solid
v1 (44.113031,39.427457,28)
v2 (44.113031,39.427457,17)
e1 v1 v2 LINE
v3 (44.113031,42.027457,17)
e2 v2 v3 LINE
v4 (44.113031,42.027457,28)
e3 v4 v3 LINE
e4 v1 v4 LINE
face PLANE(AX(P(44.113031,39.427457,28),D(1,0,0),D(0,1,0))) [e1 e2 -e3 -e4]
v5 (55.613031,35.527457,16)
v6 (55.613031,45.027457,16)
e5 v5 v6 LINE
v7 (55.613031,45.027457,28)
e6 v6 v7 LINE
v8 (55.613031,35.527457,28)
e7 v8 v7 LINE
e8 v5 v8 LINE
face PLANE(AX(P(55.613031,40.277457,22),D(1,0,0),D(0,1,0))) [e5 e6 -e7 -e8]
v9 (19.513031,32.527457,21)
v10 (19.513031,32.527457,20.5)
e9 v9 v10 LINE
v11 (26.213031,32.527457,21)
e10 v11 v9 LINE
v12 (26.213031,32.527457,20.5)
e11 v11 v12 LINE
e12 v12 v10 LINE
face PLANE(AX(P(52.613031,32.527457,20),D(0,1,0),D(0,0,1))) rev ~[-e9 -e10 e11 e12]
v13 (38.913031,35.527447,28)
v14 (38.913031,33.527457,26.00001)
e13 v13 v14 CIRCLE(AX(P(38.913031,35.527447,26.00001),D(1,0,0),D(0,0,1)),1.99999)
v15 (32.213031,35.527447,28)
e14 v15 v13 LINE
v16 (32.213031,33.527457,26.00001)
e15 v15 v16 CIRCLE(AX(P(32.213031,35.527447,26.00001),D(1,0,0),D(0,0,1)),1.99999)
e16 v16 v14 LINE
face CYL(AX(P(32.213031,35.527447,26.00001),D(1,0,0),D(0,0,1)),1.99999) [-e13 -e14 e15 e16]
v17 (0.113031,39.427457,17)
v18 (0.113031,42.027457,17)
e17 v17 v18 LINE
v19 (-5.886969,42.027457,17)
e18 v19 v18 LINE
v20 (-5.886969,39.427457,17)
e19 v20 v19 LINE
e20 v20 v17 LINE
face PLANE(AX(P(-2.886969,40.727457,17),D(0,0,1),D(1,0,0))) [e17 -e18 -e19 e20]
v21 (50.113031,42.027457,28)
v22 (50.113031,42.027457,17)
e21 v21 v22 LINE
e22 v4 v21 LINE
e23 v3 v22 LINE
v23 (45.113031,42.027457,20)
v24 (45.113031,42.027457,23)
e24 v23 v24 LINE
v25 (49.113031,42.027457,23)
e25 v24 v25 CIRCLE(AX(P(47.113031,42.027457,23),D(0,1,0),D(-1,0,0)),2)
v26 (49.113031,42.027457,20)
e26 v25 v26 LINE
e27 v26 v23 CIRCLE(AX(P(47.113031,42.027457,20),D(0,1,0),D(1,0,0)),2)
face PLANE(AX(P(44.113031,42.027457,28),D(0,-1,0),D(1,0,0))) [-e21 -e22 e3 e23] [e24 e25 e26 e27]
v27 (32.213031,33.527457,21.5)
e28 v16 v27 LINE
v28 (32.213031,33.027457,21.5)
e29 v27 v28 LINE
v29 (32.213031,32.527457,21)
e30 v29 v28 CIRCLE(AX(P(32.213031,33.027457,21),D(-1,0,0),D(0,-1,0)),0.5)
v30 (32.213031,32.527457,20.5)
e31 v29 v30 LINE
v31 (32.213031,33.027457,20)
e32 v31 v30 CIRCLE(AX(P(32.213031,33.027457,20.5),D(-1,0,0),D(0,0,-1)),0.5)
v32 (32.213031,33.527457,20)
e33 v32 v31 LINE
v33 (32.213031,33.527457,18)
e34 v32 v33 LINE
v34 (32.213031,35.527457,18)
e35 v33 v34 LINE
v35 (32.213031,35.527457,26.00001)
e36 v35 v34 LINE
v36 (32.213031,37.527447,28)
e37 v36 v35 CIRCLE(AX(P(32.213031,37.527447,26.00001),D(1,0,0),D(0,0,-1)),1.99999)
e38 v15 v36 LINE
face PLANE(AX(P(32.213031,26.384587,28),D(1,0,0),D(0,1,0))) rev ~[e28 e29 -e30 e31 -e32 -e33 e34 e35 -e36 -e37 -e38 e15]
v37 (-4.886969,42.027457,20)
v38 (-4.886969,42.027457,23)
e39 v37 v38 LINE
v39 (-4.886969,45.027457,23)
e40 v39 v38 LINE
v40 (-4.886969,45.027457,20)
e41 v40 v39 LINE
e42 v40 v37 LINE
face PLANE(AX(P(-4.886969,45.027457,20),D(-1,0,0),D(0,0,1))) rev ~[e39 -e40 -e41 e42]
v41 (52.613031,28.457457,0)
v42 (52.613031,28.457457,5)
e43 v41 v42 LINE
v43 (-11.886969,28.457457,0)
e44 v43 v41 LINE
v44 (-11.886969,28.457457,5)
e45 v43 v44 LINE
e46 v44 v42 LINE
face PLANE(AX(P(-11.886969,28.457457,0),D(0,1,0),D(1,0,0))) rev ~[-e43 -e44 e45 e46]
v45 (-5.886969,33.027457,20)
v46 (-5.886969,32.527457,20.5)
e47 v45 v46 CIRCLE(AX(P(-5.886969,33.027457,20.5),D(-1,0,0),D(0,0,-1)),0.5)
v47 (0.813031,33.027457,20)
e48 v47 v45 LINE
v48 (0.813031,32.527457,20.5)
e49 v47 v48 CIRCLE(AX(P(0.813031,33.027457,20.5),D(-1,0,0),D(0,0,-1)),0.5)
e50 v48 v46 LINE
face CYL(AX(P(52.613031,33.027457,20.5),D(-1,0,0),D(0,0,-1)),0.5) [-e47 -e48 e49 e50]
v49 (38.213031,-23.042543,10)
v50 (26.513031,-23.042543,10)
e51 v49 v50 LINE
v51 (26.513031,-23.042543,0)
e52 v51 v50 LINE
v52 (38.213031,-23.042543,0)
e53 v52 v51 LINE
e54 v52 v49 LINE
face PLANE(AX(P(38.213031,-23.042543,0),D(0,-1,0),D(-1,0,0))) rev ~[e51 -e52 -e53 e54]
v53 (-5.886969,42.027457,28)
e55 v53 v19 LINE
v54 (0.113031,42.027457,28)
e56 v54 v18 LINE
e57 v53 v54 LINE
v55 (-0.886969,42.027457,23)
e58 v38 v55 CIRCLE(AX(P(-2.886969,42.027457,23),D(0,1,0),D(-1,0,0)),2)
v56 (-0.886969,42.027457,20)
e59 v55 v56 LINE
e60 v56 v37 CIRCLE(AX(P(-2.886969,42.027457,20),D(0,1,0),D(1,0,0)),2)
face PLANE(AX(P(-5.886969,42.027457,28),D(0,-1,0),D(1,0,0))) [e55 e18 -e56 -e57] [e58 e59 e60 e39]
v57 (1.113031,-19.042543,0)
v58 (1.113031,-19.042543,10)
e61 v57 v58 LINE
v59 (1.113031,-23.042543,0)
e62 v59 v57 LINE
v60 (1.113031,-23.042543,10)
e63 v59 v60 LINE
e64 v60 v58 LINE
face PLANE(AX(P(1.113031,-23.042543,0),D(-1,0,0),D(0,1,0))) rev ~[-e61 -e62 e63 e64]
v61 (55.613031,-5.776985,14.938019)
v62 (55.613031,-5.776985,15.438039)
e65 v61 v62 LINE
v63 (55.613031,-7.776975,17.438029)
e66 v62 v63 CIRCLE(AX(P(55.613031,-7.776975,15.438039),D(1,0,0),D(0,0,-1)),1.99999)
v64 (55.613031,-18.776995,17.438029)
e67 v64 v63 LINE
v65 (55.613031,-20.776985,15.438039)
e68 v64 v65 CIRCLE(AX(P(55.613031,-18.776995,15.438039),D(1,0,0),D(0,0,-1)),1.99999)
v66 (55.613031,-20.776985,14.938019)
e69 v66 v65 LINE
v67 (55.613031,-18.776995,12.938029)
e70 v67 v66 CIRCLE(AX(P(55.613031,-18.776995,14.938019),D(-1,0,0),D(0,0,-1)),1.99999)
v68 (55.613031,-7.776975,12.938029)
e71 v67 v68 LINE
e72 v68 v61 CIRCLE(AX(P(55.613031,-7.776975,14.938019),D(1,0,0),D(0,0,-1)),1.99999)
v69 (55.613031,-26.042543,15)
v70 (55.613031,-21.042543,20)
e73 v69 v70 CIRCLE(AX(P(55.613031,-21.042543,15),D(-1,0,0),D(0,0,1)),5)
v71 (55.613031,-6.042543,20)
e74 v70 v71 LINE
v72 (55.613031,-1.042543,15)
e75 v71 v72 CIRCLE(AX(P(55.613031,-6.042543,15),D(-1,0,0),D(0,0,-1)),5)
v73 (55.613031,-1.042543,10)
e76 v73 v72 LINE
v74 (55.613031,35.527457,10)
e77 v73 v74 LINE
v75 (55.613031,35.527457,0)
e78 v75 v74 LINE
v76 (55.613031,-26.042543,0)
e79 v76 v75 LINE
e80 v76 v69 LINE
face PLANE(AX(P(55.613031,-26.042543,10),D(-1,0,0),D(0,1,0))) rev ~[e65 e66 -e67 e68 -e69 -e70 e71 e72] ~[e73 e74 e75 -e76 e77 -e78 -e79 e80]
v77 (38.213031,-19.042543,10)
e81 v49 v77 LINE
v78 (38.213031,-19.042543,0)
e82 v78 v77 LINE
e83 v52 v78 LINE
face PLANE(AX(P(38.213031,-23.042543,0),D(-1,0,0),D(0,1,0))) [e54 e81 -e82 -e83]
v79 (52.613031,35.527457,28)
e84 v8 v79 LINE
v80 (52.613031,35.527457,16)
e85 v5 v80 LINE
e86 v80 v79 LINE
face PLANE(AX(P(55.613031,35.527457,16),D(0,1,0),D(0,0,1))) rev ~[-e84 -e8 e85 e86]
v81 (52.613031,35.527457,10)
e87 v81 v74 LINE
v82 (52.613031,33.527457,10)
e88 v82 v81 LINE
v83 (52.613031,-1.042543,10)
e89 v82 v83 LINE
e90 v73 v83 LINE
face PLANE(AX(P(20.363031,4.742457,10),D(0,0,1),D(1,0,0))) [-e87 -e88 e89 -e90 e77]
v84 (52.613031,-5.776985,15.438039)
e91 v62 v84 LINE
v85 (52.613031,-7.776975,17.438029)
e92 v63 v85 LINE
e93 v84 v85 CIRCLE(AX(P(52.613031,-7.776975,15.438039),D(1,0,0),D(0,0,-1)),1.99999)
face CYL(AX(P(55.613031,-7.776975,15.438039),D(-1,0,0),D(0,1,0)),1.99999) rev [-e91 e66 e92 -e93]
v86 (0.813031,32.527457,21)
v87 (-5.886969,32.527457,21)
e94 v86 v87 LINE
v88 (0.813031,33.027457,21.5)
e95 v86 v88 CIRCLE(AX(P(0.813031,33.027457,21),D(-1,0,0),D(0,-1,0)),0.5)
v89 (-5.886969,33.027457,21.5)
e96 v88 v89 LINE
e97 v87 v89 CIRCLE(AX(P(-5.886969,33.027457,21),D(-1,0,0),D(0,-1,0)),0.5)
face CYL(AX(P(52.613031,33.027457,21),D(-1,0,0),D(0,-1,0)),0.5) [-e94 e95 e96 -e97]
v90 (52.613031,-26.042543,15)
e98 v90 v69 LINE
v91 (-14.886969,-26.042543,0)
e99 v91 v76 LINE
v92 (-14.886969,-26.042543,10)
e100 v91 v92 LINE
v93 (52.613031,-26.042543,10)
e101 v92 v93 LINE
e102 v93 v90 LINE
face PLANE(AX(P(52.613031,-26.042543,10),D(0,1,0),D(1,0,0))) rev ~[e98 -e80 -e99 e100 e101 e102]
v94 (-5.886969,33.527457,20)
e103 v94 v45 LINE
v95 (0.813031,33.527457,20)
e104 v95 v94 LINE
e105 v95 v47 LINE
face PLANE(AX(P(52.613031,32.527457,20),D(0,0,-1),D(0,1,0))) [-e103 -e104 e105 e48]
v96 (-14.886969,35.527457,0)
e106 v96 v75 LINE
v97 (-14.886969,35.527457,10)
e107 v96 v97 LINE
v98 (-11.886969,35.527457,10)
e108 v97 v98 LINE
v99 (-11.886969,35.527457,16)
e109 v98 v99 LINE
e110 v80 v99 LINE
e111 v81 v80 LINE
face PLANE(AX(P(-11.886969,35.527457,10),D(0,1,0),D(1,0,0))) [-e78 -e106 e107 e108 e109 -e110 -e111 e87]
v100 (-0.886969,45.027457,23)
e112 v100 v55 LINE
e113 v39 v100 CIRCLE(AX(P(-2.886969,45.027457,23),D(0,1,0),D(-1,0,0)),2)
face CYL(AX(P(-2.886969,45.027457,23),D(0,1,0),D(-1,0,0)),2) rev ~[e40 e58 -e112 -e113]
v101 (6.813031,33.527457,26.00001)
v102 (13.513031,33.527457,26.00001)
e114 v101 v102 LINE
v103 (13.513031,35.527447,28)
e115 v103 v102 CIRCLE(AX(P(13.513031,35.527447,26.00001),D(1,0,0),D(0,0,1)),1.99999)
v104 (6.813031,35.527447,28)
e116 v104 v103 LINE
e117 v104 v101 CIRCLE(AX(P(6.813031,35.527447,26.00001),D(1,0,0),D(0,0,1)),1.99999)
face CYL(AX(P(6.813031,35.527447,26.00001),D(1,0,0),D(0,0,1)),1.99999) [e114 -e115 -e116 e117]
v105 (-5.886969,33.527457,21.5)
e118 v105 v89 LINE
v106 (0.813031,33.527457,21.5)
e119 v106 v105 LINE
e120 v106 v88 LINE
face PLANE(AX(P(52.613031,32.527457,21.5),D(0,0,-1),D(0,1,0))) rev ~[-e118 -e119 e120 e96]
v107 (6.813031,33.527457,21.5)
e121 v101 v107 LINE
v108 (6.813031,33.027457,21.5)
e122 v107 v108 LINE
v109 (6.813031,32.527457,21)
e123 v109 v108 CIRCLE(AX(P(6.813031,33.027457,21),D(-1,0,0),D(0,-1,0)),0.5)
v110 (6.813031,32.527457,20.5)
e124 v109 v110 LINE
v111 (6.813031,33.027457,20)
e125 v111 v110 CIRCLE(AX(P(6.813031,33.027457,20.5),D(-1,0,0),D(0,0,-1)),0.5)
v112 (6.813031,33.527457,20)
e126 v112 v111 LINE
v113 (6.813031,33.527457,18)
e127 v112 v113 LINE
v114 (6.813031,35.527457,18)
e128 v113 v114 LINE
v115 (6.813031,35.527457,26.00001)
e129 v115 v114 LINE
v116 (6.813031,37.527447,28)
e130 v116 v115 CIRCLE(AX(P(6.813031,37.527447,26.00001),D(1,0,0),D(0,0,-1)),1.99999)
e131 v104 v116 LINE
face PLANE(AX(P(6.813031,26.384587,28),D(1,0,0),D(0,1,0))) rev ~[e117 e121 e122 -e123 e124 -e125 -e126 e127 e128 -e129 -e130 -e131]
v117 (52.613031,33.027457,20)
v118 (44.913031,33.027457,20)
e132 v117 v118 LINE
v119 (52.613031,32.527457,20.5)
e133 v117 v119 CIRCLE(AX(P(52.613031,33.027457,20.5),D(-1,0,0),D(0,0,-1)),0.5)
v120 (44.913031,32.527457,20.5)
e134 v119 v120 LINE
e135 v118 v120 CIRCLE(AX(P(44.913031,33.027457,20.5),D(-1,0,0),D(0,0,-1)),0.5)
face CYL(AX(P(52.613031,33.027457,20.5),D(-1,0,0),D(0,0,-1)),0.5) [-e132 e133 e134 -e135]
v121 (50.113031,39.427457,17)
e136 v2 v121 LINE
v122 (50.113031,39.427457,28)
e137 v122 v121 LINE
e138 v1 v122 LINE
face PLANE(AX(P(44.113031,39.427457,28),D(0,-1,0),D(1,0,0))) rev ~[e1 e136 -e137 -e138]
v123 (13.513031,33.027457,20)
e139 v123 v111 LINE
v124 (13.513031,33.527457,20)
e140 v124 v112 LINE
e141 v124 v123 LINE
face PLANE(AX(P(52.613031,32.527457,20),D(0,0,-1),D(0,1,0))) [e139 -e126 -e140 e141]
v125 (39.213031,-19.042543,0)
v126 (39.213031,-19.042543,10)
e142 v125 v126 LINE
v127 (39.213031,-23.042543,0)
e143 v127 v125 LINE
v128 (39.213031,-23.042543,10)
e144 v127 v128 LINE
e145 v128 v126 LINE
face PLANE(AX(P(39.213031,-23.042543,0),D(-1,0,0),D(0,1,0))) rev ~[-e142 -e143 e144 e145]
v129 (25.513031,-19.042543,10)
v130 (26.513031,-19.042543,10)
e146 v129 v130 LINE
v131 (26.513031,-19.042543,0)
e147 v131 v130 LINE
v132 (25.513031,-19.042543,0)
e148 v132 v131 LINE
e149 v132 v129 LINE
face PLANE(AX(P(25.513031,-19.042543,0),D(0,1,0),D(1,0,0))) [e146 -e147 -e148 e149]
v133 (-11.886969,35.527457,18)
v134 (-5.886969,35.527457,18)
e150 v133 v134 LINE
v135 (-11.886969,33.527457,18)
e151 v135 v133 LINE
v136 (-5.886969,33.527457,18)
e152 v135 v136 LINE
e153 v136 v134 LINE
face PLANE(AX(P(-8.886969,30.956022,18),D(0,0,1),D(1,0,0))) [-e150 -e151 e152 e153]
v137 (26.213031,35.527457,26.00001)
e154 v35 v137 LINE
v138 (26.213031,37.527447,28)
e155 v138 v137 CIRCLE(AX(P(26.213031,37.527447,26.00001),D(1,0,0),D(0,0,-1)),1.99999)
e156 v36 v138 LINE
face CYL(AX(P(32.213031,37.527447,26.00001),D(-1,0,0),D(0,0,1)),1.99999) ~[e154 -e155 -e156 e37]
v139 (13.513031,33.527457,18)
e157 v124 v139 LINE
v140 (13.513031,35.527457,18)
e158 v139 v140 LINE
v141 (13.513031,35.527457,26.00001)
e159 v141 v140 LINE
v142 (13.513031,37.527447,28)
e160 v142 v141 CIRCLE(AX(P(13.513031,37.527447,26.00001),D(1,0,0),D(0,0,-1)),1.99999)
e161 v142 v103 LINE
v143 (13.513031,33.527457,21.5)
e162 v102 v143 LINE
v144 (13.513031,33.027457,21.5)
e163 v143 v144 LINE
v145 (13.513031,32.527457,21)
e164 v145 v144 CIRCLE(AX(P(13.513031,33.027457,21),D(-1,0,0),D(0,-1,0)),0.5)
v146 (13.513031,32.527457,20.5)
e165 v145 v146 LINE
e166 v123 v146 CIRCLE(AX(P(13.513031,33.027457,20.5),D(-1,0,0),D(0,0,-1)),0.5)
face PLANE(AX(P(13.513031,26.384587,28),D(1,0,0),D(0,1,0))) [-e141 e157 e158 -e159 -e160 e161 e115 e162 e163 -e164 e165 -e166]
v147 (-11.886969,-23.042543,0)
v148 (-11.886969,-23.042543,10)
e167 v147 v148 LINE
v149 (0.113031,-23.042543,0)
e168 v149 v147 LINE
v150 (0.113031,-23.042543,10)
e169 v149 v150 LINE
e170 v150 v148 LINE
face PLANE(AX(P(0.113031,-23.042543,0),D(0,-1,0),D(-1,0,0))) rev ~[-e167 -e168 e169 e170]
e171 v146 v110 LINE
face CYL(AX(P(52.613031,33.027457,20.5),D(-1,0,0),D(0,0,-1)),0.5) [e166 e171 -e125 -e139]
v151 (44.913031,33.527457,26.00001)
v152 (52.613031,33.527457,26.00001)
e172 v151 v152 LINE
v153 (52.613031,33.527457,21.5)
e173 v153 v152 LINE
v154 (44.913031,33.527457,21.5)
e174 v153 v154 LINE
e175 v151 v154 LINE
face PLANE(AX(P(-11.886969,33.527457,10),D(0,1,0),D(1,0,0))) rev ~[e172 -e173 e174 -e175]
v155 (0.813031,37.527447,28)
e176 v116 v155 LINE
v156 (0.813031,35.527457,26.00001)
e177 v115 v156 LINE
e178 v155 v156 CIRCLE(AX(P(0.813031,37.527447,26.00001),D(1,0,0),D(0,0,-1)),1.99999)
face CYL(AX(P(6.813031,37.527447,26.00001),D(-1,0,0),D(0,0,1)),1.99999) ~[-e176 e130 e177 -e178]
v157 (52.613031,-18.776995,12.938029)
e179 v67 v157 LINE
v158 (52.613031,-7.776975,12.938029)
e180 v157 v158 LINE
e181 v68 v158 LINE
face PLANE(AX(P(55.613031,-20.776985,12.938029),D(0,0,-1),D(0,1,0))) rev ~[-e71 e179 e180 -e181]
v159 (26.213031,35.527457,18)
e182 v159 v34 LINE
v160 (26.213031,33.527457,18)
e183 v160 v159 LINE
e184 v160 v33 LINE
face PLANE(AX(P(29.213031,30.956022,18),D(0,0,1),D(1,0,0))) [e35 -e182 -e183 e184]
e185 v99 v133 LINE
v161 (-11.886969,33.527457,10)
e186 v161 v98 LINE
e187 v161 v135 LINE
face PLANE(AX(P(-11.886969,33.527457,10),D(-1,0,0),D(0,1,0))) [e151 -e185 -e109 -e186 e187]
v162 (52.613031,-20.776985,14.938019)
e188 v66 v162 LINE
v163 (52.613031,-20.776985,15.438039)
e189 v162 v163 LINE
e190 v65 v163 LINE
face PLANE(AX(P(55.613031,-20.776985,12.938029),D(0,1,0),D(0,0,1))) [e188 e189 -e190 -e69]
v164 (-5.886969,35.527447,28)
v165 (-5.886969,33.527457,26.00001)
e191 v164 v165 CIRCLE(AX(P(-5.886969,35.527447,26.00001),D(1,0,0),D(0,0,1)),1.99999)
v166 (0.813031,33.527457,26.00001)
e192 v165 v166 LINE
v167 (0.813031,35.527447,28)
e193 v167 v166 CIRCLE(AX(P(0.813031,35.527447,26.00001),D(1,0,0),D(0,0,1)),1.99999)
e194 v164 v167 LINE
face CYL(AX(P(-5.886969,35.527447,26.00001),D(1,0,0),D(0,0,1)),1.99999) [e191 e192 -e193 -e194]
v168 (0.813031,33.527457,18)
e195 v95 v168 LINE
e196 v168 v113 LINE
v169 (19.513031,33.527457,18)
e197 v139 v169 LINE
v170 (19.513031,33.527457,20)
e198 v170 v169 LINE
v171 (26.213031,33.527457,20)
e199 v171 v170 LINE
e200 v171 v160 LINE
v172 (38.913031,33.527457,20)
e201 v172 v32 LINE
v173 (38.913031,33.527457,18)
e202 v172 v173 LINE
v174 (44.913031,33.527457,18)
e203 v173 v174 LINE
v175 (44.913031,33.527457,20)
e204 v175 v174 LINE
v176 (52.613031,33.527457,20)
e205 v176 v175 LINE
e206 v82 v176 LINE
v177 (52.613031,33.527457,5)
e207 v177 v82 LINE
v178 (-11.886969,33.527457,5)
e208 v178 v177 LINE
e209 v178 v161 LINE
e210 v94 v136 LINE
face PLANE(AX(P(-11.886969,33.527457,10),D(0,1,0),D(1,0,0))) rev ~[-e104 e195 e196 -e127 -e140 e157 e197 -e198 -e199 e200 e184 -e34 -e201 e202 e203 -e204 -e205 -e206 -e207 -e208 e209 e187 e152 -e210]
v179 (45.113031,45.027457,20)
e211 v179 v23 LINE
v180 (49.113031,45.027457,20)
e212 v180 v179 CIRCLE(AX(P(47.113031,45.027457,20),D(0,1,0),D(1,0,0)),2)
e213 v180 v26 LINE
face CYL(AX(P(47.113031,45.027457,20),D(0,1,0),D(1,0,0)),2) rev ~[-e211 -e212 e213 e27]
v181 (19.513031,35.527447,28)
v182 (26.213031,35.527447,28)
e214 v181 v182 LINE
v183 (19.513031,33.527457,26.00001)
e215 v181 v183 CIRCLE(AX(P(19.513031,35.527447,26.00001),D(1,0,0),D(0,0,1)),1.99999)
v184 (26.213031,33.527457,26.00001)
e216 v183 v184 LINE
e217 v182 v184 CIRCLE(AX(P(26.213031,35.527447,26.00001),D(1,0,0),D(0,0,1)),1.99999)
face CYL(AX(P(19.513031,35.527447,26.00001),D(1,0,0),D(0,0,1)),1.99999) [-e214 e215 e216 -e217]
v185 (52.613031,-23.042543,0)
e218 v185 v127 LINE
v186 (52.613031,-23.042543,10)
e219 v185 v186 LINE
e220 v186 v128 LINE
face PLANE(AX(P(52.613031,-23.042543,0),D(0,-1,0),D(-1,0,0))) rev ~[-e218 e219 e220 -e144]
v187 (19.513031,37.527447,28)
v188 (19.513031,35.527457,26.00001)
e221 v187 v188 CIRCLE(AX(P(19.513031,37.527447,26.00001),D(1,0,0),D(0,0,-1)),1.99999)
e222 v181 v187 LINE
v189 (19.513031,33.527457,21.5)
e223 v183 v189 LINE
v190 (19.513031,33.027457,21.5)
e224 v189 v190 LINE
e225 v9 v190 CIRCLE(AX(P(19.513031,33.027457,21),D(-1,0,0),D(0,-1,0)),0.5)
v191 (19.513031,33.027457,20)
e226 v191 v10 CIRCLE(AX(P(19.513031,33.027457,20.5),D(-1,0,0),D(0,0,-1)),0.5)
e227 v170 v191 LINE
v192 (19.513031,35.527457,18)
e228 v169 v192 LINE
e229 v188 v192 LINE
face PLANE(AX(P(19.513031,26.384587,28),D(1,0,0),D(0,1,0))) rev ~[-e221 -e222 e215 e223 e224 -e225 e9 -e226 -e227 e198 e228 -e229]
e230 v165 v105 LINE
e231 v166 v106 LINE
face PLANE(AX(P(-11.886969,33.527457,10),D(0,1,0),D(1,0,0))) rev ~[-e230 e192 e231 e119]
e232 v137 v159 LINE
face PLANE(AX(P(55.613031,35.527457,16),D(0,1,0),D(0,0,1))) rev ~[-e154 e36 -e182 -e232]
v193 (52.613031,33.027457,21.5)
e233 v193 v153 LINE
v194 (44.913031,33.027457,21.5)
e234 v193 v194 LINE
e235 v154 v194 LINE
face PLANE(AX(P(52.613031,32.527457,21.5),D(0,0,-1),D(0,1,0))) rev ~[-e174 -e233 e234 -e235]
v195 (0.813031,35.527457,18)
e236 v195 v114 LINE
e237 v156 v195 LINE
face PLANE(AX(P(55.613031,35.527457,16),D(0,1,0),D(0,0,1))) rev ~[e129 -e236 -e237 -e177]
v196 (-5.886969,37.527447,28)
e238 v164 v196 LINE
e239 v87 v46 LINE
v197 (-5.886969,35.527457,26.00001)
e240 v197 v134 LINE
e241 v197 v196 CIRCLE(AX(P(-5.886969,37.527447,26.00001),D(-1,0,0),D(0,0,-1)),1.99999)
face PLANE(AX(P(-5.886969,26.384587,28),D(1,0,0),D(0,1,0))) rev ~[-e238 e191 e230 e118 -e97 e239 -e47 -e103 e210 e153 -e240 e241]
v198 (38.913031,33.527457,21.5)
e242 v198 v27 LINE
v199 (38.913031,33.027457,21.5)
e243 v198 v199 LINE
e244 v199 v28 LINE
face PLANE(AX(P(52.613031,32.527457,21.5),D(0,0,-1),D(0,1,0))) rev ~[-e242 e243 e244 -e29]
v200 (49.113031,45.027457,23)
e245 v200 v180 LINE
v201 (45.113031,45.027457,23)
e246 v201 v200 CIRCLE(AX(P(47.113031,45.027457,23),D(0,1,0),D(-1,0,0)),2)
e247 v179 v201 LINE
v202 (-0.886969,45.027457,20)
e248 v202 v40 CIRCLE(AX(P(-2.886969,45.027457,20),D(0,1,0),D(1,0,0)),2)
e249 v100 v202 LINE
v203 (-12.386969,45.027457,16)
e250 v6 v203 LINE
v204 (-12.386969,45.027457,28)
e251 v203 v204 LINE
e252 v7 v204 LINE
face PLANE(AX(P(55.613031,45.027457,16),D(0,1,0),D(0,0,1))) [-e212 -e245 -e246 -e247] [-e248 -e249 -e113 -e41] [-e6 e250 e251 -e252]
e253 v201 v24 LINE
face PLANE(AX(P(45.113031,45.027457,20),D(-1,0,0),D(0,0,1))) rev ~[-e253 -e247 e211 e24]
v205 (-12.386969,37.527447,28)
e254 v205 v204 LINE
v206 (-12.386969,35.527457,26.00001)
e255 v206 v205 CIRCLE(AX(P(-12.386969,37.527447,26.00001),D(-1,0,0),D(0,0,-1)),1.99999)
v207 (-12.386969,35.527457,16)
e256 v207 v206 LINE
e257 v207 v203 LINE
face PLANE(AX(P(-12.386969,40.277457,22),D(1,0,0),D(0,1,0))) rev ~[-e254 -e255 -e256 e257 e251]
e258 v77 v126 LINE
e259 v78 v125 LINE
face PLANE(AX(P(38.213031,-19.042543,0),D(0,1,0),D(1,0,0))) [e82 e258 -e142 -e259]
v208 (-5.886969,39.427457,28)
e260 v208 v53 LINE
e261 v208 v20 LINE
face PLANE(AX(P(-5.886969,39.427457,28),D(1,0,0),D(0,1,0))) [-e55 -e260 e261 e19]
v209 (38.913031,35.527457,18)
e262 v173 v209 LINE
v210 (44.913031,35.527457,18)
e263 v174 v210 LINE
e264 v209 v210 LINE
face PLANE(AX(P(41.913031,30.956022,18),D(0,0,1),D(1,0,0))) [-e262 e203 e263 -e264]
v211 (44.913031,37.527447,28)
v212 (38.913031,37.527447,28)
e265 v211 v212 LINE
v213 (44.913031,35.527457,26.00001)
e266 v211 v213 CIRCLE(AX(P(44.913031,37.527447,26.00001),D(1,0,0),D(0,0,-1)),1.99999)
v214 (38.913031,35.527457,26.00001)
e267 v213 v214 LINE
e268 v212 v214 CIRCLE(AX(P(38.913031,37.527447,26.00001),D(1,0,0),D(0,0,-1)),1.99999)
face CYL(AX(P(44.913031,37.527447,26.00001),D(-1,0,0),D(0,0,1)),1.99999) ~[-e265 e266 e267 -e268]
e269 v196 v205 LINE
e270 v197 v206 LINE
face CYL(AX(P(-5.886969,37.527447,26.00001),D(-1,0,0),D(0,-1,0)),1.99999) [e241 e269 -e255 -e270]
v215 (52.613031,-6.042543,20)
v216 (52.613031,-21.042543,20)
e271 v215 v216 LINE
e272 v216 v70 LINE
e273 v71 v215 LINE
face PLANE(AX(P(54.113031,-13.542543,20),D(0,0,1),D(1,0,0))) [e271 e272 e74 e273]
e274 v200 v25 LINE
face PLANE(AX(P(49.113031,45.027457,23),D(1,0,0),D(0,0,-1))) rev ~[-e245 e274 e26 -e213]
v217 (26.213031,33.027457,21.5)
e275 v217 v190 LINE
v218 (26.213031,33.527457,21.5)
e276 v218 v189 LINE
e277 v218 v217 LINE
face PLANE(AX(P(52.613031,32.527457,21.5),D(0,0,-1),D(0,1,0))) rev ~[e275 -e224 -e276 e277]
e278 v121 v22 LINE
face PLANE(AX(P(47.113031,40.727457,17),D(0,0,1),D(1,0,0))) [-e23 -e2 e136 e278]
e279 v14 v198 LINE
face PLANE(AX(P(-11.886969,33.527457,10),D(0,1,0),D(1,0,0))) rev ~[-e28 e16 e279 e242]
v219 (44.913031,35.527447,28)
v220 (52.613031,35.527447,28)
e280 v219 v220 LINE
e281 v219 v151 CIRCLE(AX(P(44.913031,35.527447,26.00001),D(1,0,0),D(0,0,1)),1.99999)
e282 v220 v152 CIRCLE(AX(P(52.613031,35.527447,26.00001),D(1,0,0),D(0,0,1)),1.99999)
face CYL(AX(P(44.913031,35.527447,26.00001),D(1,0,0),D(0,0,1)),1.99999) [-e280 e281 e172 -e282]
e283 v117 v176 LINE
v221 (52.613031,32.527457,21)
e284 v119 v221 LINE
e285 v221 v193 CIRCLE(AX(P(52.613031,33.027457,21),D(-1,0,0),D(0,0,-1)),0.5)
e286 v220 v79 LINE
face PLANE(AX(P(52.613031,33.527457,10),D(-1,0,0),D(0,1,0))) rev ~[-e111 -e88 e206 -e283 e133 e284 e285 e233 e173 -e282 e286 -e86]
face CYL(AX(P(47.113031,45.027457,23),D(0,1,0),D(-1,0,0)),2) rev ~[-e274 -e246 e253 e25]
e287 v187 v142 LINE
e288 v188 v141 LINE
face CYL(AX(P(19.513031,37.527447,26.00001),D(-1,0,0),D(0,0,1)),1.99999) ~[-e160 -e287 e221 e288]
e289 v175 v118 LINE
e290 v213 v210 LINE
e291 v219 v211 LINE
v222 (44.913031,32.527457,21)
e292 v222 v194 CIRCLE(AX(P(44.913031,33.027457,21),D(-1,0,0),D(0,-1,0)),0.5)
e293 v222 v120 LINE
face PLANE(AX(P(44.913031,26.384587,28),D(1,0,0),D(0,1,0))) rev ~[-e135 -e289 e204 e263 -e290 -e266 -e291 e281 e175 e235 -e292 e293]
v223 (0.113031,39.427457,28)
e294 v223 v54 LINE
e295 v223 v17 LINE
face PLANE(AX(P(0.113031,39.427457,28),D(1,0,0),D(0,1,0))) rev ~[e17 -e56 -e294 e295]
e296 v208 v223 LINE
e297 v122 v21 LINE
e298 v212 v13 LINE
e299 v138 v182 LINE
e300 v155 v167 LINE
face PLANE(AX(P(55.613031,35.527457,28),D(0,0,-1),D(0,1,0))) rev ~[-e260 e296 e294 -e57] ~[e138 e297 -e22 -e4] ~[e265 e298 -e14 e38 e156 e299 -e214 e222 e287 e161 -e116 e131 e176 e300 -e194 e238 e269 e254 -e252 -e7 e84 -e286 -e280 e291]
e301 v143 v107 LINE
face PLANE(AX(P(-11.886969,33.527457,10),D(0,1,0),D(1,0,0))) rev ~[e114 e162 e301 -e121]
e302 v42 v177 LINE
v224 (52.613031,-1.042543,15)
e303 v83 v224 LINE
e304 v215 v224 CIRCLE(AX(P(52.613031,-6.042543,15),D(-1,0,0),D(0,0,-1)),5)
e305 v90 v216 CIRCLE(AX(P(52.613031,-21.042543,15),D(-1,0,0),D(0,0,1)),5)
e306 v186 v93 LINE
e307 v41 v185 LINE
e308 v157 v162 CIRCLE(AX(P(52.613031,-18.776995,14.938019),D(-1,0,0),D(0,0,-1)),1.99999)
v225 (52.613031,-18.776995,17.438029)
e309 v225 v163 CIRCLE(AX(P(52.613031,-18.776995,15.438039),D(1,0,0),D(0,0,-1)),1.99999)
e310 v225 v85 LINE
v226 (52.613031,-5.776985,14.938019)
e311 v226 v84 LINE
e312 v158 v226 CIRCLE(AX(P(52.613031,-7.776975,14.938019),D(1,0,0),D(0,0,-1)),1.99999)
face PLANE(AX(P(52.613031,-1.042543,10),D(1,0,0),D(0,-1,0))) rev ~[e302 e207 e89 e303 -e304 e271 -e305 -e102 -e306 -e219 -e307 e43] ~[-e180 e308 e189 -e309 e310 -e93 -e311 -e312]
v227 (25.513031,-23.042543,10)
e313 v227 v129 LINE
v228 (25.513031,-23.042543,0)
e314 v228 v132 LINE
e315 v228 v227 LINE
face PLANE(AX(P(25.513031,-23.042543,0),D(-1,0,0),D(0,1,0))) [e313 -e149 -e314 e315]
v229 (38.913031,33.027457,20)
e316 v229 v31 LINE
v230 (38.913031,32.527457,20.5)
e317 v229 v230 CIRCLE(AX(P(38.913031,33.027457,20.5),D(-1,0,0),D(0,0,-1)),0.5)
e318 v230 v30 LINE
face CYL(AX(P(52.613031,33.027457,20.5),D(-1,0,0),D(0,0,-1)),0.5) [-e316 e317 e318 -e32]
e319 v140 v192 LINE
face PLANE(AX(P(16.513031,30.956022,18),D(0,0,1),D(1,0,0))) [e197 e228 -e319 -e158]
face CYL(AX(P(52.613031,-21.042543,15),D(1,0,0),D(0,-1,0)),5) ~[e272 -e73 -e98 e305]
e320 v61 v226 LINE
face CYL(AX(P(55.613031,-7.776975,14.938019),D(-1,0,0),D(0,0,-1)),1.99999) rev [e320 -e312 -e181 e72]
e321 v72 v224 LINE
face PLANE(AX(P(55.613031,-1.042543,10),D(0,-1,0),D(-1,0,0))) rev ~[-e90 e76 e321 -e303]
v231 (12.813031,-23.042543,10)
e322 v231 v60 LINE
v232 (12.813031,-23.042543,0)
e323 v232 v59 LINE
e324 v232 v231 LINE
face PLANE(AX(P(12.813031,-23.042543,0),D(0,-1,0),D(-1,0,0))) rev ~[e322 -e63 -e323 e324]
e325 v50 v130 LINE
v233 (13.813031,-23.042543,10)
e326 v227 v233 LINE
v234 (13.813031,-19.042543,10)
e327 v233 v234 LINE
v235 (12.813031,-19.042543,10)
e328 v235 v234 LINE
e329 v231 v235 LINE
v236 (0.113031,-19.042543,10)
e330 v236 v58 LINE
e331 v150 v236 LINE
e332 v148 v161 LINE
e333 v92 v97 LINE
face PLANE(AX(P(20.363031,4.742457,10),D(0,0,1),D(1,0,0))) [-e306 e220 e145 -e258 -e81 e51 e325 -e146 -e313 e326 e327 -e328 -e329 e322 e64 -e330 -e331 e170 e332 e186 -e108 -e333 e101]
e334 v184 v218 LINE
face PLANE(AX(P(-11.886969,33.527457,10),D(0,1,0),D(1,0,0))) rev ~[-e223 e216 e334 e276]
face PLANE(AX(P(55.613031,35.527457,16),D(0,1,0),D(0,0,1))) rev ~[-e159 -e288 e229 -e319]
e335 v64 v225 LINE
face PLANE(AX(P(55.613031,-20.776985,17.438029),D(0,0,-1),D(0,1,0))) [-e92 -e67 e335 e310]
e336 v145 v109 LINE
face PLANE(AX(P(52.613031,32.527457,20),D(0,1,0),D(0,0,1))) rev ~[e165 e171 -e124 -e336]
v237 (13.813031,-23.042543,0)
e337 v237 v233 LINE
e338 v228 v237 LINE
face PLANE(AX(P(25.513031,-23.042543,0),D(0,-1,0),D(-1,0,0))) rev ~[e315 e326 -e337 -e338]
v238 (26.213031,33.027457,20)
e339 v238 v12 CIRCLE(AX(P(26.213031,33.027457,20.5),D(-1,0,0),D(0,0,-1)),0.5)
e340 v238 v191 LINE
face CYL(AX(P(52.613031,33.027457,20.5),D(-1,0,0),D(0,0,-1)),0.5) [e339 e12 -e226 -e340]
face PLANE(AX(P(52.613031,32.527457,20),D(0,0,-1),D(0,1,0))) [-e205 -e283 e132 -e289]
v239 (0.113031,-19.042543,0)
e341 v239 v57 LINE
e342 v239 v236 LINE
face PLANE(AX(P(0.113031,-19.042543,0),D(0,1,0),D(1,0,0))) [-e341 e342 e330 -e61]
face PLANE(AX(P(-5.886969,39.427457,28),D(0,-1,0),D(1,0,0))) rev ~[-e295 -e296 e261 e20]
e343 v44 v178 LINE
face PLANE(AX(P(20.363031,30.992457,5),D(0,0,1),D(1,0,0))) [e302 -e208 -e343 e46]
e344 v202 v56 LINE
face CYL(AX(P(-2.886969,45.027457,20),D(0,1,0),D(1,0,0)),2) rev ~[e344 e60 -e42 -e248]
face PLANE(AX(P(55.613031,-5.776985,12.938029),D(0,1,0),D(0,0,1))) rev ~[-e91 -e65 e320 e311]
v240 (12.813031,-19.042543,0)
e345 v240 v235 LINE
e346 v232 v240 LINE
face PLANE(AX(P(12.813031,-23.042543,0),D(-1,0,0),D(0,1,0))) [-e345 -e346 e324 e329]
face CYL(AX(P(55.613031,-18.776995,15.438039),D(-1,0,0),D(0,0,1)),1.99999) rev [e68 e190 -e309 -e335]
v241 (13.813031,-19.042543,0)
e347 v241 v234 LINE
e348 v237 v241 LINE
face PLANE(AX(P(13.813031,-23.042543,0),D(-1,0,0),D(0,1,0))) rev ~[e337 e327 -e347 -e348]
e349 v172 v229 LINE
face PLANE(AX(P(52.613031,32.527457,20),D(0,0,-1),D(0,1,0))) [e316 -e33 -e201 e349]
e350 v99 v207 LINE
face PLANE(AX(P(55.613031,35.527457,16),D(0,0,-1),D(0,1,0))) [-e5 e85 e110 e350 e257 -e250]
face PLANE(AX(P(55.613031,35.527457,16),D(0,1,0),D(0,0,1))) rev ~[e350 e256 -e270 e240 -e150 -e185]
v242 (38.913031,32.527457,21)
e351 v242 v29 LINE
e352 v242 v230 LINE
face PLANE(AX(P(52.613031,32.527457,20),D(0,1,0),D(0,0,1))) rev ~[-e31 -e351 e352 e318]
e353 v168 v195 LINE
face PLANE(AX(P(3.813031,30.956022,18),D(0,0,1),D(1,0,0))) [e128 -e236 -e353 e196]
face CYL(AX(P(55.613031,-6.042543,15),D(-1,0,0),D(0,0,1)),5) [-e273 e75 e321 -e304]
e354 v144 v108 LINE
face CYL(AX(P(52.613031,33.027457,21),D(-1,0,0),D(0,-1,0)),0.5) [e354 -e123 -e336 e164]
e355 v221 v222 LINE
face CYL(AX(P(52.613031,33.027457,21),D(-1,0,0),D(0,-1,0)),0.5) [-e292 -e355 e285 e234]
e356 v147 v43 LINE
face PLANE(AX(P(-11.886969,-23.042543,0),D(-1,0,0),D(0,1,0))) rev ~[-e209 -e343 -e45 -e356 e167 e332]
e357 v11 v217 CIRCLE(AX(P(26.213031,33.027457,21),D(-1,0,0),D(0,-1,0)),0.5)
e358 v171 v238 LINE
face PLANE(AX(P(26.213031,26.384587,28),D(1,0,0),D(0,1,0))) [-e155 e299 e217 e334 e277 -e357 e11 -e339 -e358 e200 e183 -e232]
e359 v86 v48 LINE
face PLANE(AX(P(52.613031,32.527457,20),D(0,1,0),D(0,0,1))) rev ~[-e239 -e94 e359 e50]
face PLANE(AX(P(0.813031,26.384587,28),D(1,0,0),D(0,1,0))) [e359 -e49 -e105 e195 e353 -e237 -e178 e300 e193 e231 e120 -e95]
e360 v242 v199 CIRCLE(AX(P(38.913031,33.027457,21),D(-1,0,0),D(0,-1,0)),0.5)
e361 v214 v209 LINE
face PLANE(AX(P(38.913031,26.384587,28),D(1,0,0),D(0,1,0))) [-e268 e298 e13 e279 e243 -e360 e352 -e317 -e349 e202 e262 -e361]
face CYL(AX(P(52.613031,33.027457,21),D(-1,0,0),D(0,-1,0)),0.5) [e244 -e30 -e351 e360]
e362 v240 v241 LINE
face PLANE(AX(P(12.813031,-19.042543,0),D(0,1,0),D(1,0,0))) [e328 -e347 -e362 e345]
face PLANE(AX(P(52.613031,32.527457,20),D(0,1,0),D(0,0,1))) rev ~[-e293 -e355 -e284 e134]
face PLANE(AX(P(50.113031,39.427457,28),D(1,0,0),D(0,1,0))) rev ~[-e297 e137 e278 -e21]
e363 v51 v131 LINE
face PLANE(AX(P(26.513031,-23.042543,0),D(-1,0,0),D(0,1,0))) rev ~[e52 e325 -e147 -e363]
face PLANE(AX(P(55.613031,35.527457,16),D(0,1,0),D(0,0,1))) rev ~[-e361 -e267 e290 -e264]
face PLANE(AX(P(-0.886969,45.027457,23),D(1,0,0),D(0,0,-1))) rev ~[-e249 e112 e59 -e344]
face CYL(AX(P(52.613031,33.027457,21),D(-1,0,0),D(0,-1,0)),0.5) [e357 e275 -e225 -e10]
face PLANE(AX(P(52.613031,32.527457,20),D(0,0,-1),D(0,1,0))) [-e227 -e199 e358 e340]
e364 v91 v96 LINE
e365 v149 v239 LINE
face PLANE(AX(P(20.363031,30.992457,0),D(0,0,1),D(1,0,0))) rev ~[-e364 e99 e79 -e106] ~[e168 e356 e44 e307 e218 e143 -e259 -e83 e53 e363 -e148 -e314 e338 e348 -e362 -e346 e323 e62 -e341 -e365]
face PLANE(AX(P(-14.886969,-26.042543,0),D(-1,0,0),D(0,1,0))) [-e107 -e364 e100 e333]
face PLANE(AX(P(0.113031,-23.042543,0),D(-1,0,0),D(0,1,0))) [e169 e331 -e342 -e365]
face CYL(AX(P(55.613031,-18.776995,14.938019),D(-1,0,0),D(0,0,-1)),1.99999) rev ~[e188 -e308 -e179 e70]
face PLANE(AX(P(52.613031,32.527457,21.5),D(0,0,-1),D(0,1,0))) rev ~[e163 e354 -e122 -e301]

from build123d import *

# Parameters (mm, degrees)
F0_W      = 70.5
F0_H      = 61.57
F0_W_2    = 1
F0_H_2    = 4
F1_DEPTH  = 10
F0_W_3    = 64.5
F0_H_3    = 5.07
F2_DEPTH  = 5
F3_W      = 64.5
F3_H      = 2
F4_DEPTH  = 18
F5_W      = 1
F5_H      = 1.5
F6_DEPTH  = 64.5
F7_R      = 0.5
F8_W      = 6
F8_H      = 9.142870052
F9_DEPTH  = 10
F10_W     = 9.5
F10_H     = 12
F11_DEPTH = 68
F13_DEPTH = 4
F14_W     = 6
F14_H     = 2.6
F15_DEPTH = 11
F17_DEPTH = 10
F18_W     = 15
F18_H     = 4.5
F19_DEPTH = 25
F20_R     = 5
F21_R     = 1.99999


# Not quite as in the source:
# - a fillet or chamfer is up to 0.001 mm smaller than in the source, because OpenCascade refuses the exact size


with BuildPart() as f1:
    # F0 (on Top) → F1 (new body)
    with BuildSketch(Plane.XY):
        with Locations((20.3630310733, 4.7424566842)):
            Rectangle(F0_W, F0_H)
        Polygon((-11.8869689267, 28.4574566842), (-11.8869689267, 33.5274566842), (52.6130310733, 33.5274566842), (52.6130310733, 28.4574566842), (52.6130310733, -23.0425433158), (39.2130310733, -23.0425433158), (38.2130310733, -23.0425433158), (26.5130310733, -23.0425433158), (25.5130310733, -23.0425433158), (13.8130310733, -23.0425433158), (12.8130310733, -23.0425433158), (1.1130310733, -23.0425433158), (0.1130310733, -23.0425433158), (-11.8869689267, -23.0425433158), align=None, mode=Mode.SUBTRACT)
        with Locations((0.6130310733, -21.0425433158)):
            Rectangle(F0_W_2, F0_H_2)
        with Locations((13.3130310733, -21.0425433158)):
            Rectangle(F0_W_2, F0_H_2)
        with Locations((26.0130310733, -21.0425433158)):
            Rectangle(F0_W_2, F0_H_2)
        with Locations((38.7130310733, -21.0425433158)):
            Rectangle(F0_W_2, F0_H_2)
    extrude(amount=F1_DEPTH)

    # F0 (on Top) → F2 (join)
    with BuildSketch(Plane.XY):
        with Locations((20.3630310733, 30.9924566842)):
            Rectangle(F0_W_3, F0_H_3)
    extrude(amount=F2_DEPTH)

    # F3 (on face) → F4 (join)
    with BuildSketch(Plane.XY.offset(10)):
        with Locations((20.3630310733, 34.5274566842)):
            Rectangle(F3_W, F3_H)
    extrude(amount=F4_DEPTH)

    # F5 (on face) → F6 (join)
    with BuildSketch(Plane.YZ.offset(52.6130310733)):
        with Locations((33.0274566842, 20.75)):
            Rectangle(F5_W, F5_H)
    extrude(amount=-F6_DEPTH)

    # F7
    f7_edges = [f1.edges().sort_by_distance(p)[0] for p in [
        (20.363031, 32.527457, 21.5),
        (20.363031, 32.527457, 20),
    ]]
    fillet(f7_edges, radius=F7_R)

    # F8 (on face) → F9 (cut)
    with BuildSketch(Plane.XY.offset(28)):
        with Locations((-8.8869689267, 30.9560216582)):
            Rectangle(F8_W, F8_H)
        with Locations((3.8130310733, 30.9560216582)):
            Rectangle(F8_W, F8_H)
        with Locations((16.5130310733, 30.9560216582)):
            Rectangle(F8_W, F8_H)
        with Locations((29.2130310733, 30.9560216582)):
            Rectangle(F8_W, F8_H)
        with Locations((41.9130310733, 30.9560216582)):
            Rectangle(F8_W, F8_H)
    extrude(amount=-F9_DEPTH, mode=Mode.SUBTRACT)

    # F10 (on face) → F11 (join)
    with BuildSketch(Plane.YZ.offset(55.6130310733)):
        with Locations((40.2774566842, 22)):
            Rectangle(F10_W, F10_H)
    extrude(amount=-F11_DEPTH)

    # F12 (on face) → F13 (cut)
    with BuildSketch(Plane(origin=(0, 45.0274566842, 0), x_dir=(-1, 0, 0), z_dir=(0, 1, 0))):
        with BuildLine():
            ThreePointArc((-48.4359067289, 21.5), (-48.9359067289, 20.8228756555), (-49.1130310733, 20))
            ThreePointArc((-49.1130310733, 20), (-47.1130310733, 18), (-45.1130310733, 20))
            ThreePointArc((-45.1130310733, 20), (-45.2901554178, 20.8228756555), (-45.7901554178, 21.5))
            ThreePointArc((-45.7901554178, 21.5), (-47.1130310733, 21), (-48.4359067289, 21.5))
        make_face()
        with BuildLine():
            Line((-49.1130310733, 23), (-49.1130310733, 20))
            ThreePointArc((-49.1130310733, 20), (-48.9359067289, 20.8228756555), (-48.4359067289, 21.5))
            ThreePointArc((-48.4359067289, 21.5), (-48.9359067289, 22.1771243445), (-49.1130310733, 23))
        make_face()
        with BuildLine():
            ThreePointArc((-45.7901554178, 21.5), (-45.2901554178, 20.8228756555), (-45.1130310733, 20))
            Line((-45.1130310733, 20), (-45.1130310733, 23))
            ThreePointArc((-45.1130310733, 23), (-45.2901554178, 22.1771243445), (-45.7901554178, 21.5))
        make_face()
        with BuildLine():
            ThreePointArc((-49.1130310733, 23), (-48.9359067289, 22.1771243445), (-48.4359067289, 21.5))
            ThreePointArc((-48.4359067289, 21.5), (-47.1130310733, 22), (-45.7901554178, 21.5))
            ThreePointArc((-45.7901554178, 21.5), (-45.2901554178, 22.1771243445), (-45.1130310733, 23))
            ThreePointArc((-45.1130310733, 23), (-47.1130310733, 25), (-49.1130310733, 23))
        make_face()
        with BuildLine():
            ThreePointArc((1.5640932711, 21.5), (1.0640932711, 20.8228756555), (0.8869689267, 20))
            ThreePointArc((0.8869689267, 20), (2.8869689267, 18), (4.8869689267, 20))
            ThreePointArc((4.8869689267, 20), (4.7098445822, 20.8228756555), (4.2098445822, 21.5))
            ThreePointArc((4.2098445822, 21.5), (2.8869689267, 21), (1.5640932711, 21.5))
        make_face()
        with BuildLine():
            Line((0.8869689267, 23), (0.8869689267, 20))
            ThreePointArc((0.8869689267, 20), (1.0640932711, 20.8228756555), (1.5640932711, 21.5))
            ThreePointArc((1.5640932711, 21.5), (1.0640932711, 22.1771243445), (0.8869689267, 23))
        make_face()
        with BuildLine():
            ThreePointArc((4.2098445822, 21.5), (4.7098445822, 20.8228756555), (4.8869689267, 20))
            Line((4.8869689267, 20), (4.8869689267, 23))
            ThreePointArc((4.8869689267, 23), (4.7098445822, 22.1771243445), (4.2098445822, 21.5))
        make_face()
        with BuildLine():
            ThreePointArc((0.8869689267, 23), (1.0640932711, 22.1771243445), (1.5640932711, 21.5))
            ThreePointArc((1.5640932711, 21.5), (2.8869689267, 22), (4.2098445822, 21.5))
            ThreePointArc((4.2098445822, 21.5), (4.7098445822, 22.1771243445), (4.8869689267, 23))
            ThreePointArc((4.8869689267, 23), (2.8869689267, 25), (0.8869689267, 23))
        make_face()
        with BuildLine():
            ThreePointArc((-45.7901554178, 21.5), (-47.1130310733, 22), (-48.4359067289, 21.5))
            ThreePointArc((-48.4359067289, 21.5), (-47.1130310733, 21), (-45.7901554178, 21.5))
        make_face()
        with BuildLine():
            ThreePointArc((4.2098445822, 21.5), (2.8869689267, 22), (1.5640932711, 21.5))
            ThreePointArc((1.5640932711, 21.5), (2.8869689267, 21), (4.2098445822, 21.5))
        make_face()
    extrude(amount=-F13_DEPTH, mode=Mode.SUBTRACT)

    # F14 (on face) → F15 (cut)
    with BuildSketch(Plane.XY.offset(28)):
        with Locations((-2.8869689267, 40.7274566842)):
            Rectangle(F14_W, F14_H)
        with Locations((47.1130310733, 40.7274566842)):
            Rectangle(F14_W, F14_H)
    extrude(amount=-F15_DEPTH, mode=Mode.SUBTRACT)

    # F16 (on face) → F17 (join)
    with BuildSketch(Plane.XY.offset(10)):
        Polygon((52.6130310733, -26.0425433158), (55.6130310733, -26.0425433158), (55.6130310733, -1.0425433158), (52.6130310733, -1.0425433158), (52.6130310733, -23.0425433158), align=None)
    extrude(amount=F17_DEPTH)

    # F18 (on face) → F19 (cut)
    with BuildSketch(Plane.YZ.offset(55.6130310733)):
        with Locations((-13.2769846171, 15.1880288571)):
            Rectangle(F18_W, F18_H)
    extrude(amount=-F19_DEPTH, mode=Mode.SUBTRACT)

    # F20
    f20_edges = [f1.edges().sort_by_distance(p)[0] for p in [
        (54.113031, -1.042543, 20),
        (54.113031, -26.042543, 20),
    ]]
    fillet(f20_edges, radius=F20_R)

    # F21 (radius 2 in the source; OpenCascade refuses exactly that, so slightly less here)
    f21_edges = [f1.edges().sort_by_distance(p)[0] for p in [
        (54.113031, -20.776985, 17.438029),
        (54.113031, -20.776985, 12.938029),
        (54.113031, -5.776985, 12.938029),
        (54.113031, -5.776985, 17.438029),
        (41.913031, 35.527457, 28),
        (48.763031, 33.527457, 28),
        (35.563031, 33.527457, 28),
        (29.213031, 35.527457, 28),
        (22.863031, 33.527457, 28),
        (16.513031, 35.527457, 28),
        (10.163031, 33.527457, 28),
        (3.813031, 35.527457, 28),
        (-2.536969, 33.527457, 28),
        (-9.136969, 35.527457, 28),
    ]]
    fillet(f21_edges, radius=F21_R)


solid = f1.part
